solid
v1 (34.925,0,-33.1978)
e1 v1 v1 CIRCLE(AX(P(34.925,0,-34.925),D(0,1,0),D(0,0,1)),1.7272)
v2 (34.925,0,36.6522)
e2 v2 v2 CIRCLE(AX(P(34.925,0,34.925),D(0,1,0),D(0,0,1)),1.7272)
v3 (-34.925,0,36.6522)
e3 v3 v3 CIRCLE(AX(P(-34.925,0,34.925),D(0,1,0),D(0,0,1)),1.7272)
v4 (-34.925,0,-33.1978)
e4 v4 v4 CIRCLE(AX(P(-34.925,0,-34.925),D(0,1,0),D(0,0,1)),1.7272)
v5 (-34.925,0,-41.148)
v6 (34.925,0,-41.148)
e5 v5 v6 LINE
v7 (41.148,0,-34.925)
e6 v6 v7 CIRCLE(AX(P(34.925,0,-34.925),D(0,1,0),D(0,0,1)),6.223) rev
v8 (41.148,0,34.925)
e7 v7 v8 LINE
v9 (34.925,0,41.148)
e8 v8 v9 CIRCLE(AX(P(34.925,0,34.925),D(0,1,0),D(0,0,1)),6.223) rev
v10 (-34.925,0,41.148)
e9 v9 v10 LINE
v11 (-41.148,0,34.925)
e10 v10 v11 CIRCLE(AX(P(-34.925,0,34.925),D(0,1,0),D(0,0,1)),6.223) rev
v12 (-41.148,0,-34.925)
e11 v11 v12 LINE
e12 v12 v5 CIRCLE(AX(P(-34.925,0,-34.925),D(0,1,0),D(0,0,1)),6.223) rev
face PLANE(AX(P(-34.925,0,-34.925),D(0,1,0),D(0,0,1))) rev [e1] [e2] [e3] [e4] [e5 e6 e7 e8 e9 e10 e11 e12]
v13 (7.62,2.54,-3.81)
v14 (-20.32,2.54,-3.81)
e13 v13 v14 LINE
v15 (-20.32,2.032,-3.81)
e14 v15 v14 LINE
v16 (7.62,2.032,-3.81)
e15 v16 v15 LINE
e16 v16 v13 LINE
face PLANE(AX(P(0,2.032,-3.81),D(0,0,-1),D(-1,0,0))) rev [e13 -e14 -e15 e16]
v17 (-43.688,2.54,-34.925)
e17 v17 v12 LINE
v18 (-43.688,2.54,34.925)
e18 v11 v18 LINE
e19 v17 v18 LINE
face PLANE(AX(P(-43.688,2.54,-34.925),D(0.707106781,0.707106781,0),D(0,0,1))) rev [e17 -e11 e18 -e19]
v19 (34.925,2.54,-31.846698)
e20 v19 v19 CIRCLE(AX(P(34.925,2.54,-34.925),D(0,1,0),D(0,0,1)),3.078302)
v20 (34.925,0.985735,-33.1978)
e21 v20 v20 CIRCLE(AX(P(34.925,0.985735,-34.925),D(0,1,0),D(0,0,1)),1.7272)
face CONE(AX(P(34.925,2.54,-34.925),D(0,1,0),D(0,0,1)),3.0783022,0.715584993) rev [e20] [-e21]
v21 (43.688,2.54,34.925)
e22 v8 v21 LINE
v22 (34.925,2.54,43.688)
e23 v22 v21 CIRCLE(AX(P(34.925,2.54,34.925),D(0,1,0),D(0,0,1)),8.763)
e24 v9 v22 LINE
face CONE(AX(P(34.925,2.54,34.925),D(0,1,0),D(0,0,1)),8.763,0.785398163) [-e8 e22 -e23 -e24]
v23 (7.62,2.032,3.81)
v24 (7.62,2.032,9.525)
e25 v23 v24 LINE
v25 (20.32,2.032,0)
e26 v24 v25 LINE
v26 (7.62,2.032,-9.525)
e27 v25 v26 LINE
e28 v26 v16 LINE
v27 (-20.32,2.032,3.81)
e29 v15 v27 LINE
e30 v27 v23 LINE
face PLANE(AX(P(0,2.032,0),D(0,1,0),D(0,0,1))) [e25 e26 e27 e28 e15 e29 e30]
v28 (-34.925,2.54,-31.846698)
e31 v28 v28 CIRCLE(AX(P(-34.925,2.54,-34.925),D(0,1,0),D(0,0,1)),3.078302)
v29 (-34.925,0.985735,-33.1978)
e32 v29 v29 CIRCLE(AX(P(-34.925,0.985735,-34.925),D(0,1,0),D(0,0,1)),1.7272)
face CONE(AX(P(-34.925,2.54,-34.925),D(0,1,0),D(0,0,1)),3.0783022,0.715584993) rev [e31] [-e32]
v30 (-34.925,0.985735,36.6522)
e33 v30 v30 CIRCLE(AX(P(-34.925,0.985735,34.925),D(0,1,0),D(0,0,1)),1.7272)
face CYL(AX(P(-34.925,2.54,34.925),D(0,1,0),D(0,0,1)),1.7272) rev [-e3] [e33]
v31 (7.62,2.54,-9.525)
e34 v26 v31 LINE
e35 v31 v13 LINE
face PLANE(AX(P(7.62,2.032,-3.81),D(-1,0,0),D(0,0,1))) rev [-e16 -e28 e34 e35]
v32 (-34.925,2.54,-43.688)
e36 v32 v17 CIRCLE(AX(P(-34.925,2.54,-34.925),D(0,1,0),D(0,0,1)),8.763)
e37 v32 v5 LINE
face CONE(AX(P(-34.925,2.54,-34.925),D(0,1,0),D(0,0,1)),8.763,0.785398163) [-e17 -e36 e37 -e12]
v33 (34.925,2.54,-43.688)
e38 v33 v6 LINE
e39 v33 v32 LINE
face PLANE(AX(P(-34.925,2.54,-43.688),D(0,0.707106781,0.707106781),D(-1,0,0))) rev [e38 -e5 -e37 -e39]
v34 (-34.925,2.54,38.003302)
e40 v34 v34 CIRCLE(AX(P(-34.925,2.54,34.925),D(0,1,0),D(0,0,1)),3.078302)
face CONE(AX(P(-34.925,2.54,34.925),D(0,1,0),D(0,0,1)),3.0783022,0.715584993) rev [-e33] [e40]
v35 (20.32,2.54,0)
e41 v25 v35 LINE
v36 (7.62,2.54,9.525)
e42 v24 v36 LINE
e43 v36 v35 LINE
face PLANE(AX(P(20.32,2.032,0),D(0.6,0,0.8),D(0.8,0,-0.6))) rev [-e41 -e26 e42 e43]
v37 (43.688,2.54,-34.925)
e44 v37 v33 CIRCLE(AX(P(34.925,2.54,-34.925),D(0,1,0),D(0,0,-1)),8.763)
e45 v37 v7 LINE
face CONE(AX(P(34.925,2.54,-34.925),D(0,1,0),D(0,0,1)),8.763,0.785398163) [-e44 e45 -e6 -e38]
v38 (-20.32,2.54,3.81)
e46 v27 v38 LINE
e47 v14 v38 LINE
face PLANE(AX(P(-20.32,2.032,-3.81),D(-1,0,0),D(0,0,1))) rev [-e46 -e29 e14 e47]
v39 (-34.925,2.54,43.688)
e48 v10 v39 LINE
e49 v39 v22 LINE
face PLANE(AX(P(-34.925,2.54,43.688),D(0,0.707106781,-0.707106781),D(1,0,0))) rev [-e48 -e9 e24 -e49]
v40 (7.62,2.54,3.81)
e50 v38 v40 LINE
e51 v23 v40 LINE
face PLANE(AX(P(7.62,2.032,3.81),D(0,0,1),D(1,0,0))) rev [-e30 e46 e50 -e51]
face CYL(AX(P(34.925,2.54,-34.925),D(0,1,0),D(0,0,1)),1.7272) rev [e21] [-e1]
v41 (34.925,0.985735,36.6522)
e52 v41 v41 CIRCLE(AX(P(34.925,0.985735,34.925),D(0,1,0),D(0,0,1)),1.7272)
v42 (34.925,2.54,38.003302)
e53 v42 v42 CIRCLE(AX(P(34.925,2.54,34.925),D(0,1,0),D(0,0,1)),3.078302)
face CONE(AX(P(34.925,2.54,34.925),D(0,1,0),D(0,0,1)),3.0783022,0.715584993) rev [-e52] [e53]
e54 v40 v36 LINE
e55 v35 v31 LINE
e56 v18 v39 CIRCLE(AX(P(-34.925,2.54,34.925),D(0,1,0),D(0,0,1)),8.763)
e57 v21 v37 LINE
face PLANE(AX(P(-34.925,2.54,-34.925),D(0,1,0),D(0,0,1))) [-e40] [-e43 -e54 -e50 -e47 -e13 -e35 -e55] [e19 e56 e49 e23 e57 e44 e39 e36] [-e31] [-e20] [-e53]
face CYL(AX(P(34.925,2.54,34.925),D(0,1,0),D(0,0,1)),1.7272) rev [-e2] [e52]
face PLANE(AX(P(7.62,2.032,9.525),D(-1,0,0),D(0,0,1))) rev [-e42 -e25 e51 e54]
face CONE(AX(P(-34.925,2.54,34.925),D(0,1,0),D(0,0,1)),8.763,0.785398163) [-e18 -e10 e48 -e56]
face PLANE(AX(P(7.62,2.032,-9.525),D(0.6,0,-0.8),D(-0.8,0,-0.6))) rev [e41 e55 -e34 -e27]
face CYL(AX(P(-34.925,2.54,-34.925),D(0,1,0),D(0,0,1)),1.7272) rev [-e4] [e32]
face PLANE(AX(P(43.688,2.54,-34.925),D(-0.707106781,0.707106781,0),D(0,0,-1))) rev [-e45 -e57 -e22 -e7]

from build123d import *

# Parameters (mm, degrees)
BOSS_EXTRUDE1_DEPTH                           = 2.54
CHAMFER1_SIZE                                 = 2.54
CSK_FOR_4_FLAT_HEAD_MACHINE_SCREW1_AT_2_COUNT = 2
CSK_FOR_4_FLAT_HEAD_MACHINE_SCREW1_AT_2_PITCH = 69.85
CSK_FOR_4_FLAT_HEAD_MACHINE_SCREW1_AT_3_COUNT = 2
CSK_FOR_4_FLAT_HEAD_MACHINE_SCREW1_AT_3_PITCH = 69.85
CSK_FOR_4_FLAT_HEAD_MACHINE_SCREW1_AT_4_COUNT = 2
CSK_FOR_4_FLAT_HEAD_MACHINE_SCREW1_AT_4_PITCH = 98.782817332
CUT_EXTRUDE2_DEPTH                            = 0.508


with BuildPart() as part:
    # Sketch1 → Boss-Extrude1 (new body)
    with BuildSketch(Plane(origin=(0, 0, 0), x_dir=(1, 0, 0), z_dir=(0, 1, 0))):
        with BuildLine():
            Line((-43.688, 34.925), (-43.688, -34.925))
            ThreePointArc((-43.688, -34.925), (-41.121376724, -41.121376724), (-34.925, -43.688))
            Line((-34.925, -43.688), (34.925, -43.688))
            ThreePointArc((34.925, -43.688), (41.121376724, -41.121376724), (43.688, -34.925))
            Line((43.688, -34.925), (43.688, 34.925))
            ThreePointArc((43.688, 34.925), (41.121376724, 41.121376724), (34.925, 43.688))
            Line((34.925, 43.688), (-34.925, 43.688))
            ThreePointArc((-34.925, 43.688), (-41.121376724, 41.121376724), (-43.688, 34.925))
        make_face()
    extrude(amount=BOSS_EXTRUDE1_DEPTH)

    # Chamfer1
    chamfer1_edges = [part.edges().sort_by_distance(p)[0] for p in [
        (-43.688, 0, 0),
        (-41.121376724, 0, 41.121376724),
        (-41.121376724, 0, -41.121376724),
        (0, 0, 43.688),
        (0, 0, -43.688),
        (41.121376724, 0, 41.121376724),
        (41.121376724, 0, -41.121376724),
        (43.688, 0, 0),
    ]]
    chamfer(chamfer1_edges, length=CHAMFER1_SIZE - 0.0001)  # a hair under: the kernel refuses the full size

    # Sketch6 → CSK for #4 Flat Head Machine Screw1 (revolve, cut)
    with BuildSketch(Plane(origin=(-34.925, 2.54, -34.925), x_dir=(0, 0, 1), z_dir=(1, 0, 0))):
        Polygon((0, 0), (0, 2.54), (1.7272, 2.54), (1.7272, 1.554265286), (3.0783022, 0), align=None)
    csk_for_4_flat_head_machine_screw1 = revolve(axis=Axis((-34.925, 8.89, -34.925), (0, -1, 0)), mode=Mode.SUBTRACT)

    # CSK for #4 Flat Head Machine Screw1 at 2: CSK for #4 Flat Head Machine Screw1 ×2
    with Locations(*[(i * CSK_FOR_4_FLAT_HEAD_MACHINE_SCREW1_AT_2_PITCH, 0, 0) for i in range(1, CSK_FOR_4_FLAT_HEAD_MACHINE_SCREW1_AT_2_COUNT)]):
        add(csk_for_4_flat_head_machine_screw1, mode=Mode.SUBTRACT)

    # CSK for #4 Flat Head Machine Screw1 at 3: CSK for #4 Flat Head Machine Screw1 ×2
    with Locations(*[(0, 0, i * CSK_FOR_4_FLAT_HEAD_MACHINE_SCREW1_AT_3_PITCH) for i in range(1, CSK_FOR_4_FLAT_HEAD_MACHINE_SCREW1_AT_3_COUNT)]):
        add(csk_for_4_flat_head_machine_screw1, mode=Mode.SUBTRACT)

    # CSK for #4 Flat Head Machine Screw1 at 4: CSK for #4 Flat Head Machine Screw1 ×2
    with Locations(*[Vector(0.7071067811865477, 0, 0.7071067811865475) * (i * CSK_FOR_4_FLAT_HEAD_MACHINE_SCREW1_AT_4_PITCH) for i in range(1, CSK_FOR_4_FLAT_HEAD_MACHINE_SCREW1_AT_4_COUNT)]):
        add(csk_for_4_flat_head_machine_screw1, mode=Mode.SUBTRACT)

    # Sketch3 → Cut-Extrude2 (cut)
    with BuildSketch(Plane(origin=(0, 2.54, 0), x_dir=(1, 0, 0), z_dir=(0, 1, 0))):
        Polygon((0, 3.81), (7.62, 3.81), (7.62, 9.525), (20.32, 0), (7.62, -9.525), (7.62, -3.81), (0, -3.81), (-20.32, -3.81), (-20.32, 3.81), align=None)
    extrude(amount=-CUT_EXTRUDE2_DEPTH, mode=Mode.SUBTRACT)


solid = part.part
